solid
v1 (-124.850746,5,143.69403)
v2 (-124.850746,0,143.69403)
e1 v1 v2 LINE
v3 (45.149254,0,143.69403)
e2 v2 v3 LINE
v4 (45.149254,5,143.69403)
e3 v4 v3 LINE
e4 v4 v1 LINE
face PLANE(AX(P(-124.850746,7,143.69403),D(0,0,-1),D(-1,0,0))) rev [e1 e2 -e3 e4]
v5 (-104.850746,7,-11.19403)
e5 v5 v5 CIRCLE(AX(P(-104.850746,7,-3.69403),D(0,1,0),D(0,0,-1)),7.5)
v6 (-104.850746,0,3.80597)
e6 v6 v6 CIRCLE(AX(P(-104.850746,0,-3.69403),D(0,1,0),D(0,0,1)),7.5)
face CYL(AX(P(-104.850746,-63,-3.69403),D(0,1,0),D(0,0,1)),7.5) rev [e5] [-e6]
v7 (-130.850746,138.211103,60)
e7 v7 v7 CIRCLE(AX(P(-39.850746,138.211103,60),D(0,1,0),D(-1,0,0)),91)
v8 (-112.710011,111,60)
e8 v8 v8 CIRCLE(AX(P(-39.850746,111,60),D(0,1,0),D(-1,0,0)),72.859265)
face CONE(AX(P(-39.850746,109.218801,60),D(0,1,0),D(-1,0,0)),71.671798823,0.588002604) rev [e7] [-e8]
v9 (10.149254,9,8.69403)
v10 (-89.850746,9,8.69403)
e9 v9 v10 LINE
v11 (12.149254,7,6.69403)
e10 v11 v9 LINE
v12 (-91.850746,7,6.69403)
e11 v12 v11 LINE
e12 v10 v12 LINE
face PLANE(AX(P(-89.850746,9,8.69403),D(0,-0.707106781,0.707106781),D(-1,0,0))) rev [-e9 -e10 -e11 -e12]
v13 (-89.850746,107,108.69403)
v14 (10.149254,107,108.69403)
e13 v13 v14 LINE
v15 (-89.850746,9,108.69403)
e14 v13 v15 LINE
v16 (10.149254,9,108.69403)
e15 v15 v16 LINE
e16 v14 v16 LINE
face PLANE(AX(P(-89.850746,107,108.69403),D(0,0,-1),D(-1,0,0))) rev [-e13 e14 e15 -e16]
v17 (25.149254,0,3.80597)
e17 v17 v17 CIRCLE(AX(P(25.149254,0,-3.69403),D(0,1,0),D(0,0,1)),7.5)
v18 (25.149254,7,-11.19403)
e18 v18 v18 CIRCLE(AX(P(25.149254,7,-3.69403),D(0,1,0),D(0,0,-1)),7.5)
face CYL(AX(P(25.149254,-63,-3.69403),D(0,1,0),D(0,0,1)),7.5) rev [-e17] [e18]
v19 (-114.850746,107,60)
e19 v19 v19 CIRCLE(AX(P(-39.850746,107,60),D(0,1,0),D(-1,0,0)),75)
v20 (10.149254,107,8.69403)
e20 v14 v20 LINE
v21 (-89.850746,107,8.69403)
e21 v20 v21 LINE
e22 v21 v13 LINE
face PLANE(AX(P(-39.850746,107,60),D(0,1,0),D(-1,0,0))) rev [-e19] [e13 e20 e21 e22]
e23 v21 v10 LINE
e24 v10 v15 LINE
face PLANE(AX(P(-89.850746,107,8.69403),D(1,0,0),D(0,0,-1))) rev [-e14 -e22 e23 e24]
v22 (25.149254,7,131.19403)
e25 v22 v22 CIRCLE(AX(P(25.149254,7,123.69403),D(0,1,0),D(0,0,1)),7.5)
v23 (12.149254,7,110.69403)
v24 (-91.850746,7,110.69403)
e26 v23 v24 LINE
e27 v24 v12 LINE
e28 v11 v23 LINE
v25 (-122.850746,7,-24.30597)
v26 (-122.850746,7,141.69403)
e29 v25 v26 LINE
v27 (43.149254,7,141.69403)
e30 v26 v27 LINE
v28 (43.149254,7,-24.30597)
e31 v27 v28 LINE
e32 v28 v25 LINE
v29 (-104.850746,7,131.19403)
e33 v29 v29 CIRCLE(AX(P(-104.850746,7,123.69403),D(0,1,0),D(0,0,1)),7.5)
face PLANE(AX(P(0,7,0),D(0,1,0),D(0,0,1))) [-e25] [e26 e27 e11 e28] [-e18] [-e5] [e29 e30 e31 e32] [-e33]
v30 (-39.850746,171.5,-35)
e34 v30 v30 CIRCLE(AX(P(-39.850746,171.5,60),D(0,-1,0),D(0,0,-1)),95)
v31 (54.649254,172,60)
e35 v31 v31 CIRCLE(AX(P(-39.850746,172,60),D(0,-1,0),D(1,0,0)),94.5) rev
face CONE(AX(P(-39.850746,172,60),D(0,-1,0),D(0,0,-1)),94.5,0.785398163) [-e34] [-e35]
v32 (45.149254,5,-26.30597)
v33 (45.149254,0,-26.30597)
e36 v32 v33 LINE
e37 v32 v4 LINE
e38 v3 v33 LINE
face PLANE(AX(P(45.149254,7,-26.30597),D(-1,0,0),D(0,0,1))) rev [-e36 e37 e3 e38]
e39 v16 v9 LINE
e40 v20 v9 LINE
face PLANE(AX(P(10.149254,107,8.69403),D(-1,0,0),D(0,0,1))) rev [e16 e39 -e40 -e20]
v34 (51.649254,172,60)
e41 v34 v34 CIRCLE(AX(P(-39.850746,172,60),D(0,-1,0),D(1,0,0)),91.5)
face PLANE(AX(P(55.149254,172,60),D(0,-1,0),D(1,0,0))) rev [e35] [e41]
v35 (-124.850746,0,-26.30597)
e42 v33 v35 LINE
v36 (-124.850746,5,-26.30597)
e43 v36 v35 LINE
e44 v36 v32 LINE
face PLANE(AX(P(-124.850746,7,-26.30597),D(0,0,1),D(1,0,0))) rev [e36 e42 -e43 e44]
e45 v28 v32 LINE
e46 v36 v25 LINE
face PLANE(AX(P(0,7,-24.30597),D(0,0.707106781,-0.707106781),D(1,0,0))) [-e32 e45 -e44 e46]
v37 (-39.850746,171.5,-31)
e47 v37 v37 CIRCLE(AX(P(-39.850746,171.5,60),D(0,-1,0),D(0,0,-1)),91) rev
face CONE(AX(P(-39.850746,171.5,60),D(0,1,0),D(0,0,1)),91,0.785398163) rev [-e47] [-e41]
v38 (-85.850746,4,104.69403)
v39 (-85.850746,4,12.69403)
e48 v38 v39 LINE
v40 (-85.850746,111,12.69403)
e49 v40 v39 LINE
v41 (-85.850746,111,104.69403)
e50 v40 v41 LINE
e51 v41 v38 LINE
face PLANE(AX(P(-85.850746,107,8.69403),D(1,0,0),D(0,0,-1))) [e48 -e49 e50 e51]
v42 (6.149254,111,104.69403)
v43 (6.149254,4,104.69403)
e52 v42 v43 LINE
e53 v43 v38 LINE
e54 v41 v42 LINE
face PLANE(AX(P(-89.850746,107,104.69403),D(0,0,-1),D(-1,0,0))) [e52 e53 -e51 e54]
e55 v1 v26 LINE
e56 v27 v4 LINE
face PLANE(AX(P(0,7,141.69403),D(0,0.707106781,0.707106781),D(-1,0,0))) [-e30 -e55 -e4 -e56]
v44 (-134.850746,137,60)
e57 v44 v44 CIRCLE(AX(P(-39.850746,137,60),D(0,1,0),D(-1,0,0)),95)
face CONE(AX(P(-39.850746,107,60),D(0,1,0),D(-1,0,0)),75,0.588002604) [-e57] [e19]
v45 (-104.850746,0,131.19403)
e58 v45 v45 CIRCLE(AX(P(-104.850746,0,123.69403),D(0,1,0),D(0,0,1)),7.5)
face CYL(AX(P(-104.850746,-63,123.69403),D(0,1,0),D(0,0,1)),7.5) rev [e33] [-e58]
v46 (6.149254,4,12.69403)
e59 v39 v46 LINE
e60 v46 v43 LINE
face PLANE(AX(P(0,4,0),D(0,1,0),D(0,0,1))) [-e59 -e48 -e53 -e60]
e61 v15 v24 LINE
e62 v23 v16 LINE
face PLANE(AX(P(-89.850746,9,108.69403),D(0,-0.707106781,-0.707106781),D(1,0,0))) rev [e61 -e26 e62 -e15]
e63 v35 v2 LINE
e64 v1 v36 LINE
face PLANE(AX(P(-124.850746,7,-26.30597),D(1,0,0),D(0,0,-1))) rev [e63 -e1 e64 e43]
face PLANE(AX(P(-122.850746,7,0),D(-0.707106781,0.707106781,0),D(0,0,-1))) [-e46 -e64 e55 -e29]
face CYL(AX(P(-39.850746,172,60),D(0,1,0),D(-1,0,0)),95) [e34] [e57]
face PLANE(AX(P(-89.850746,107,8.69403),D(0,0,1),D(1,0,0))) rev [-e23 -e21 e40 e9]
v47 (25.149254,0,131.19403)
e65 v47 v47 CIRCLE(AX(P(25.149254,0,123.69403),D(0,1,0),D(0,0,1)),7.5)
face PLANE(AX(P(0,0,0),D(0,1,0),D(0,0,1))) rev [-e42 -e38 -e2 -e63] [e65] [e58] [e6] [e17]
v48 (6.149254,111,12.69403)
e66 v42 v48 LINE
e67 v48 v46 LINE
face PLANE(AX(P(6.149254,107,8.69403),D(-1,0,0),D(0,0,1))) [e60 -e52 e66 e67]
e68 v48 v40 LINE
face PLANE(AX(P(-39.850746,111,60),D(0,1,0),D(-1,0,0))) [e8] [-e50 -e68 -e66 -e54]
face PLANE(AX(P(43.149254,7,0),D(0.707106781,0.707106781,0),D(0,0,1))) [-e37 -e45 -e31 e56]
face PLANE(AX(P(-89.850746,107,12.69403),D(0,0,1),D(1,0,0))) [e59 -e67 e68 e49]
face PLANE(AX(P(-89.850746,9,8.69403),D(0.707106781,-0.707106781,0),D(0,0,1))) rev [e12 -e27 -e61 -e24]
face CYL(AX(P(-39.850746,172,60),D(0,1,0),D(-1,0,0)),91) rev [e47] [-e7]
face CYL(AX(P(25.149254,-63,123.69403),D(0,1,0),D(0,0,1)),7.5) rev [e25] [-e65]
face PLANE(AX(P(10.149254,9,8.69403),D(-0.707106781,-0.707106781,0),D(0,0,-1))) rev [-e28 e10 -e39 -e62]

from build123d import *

# Parameters (mm, degrees)
ESQUISSE1_W             = 170
ESQUISSE1_H             = 170
BOSS_EXTRU_1_DEPTH      = 7
ESQUISSE2_W             = 100
ESQUISSE2_H             = 100
BOSS_EXTRU_2_DEPTH      = 100
COQUE1_START            = 4
COQUE1_OUTLINE_W        = 92
COQUE1_OUTLINE_H        = 92
COQUE1_DEPTH            = 168
COQUE1_START_2          = 138.211102451
COQUE1_2_OUTLINE_R      = 91
COQUE1_2_OUTLINE_W      = 92
COQUE1_2_OUTLINE_H      = 92
COQUE1_2_DEPTH          = 33.788897549
CHANFREIN1_SIZE         = 2
CHANFREIN2_SIZE         = 0.5
ESQUISSE4_R             = 7.5
ENL_V_MAT_EXTRU_1_DEPTH = 70


with BuildPart() as part:
    # Esquisse1 → Boss.-Extru.1 (new body)
    with BuildSketch(Plane(origin=(0, 0, 0), x_dir=(1, 0, 0), z_dir=(0, 1, 0))):
        with Locations((-39.850746269, -58.694029851)):
            Rectangle(ESQUISSE1_W, ESQUISSE1_H)
    extrude(amount=BOSS_EXTRU_1_DEPTH)

    # Esquisse2 → Boss.-Extru.2 (add)
    with BuildSketch(Plane(origin=(0, 7, 0), x_dir=(1, 0, 0), z_dir=(0, 1, 0))):
        with Locations((-39.850746269, -58.694029851)):
            Rectangle(ESQUISSE2_W, ESQUISSE2_H)
    extrude(amount=BOSS_EXTRU_2_DEPTH)

    # Esquisse3 → Révolution1 (revolve)
    with BuildSketch(Plane.XY.offset(60), mode=Mode.PRIVATE) as r_volution1_sk:
        Polygon((55.149253731, 137), (55.149253731, 172), (-39.850746269, 172), (-39.850746269, 107), (35.149253731, 107), align=None)
    revolve(r_volution1_sk.sketch.rotate(Axis((-39.850746269, 172, 60), (0, -1, 0)), 180), axis=Axis((-39.850746269, 172, 60), (0, -1, 0)))

    # Coque1: read off the stored shape, not the designer's step
    # Coque1 outline → Coque1 (cut)
    with BuildSketch(Plane(origin=(0, 0, 0), x_dir=(1, 0, 0), z_dir=(0, 1, 0)).offset(COQUE1_START)):
        with Locations((-39.850746269, -58.694029851)):
            Rectangle(COQUE1_OUTLINE_W, COQUE1_OUTLINE_H)
    extrude(amount=COQUE1_DEPTH, mode=Mode.SUBTRACT)

    # Coque1 2 outline → Coque1 2 (cut)
    with BuildSketch(Plane(origin=(0, 0, 0), x_dir=(1, 0, 0), z_dir=(0, 1, 0)).offset(COQUE1_START_2)):
        with Locations((-39.850746269, -60)):
            Circle(COQUE1_2_OUTLINE_R)
        with Locations((-39.850746269, -58.694029851)):
            Rectangle(COQUE1_2_OUTLINE_W, COQUE1_2_OUTLINE_H, mode=Mode.SUBTRACT)
    extrude(amount=COQUE1_2_DEPTH, mode=Mode.SUBTRACT)

    # Coque1 3 outline → Coque1 3 (revolve, cut)
    with BuildSketch(Plane(origin=(-39.850746269, 0, 60), x_dir=(1, 0, 0), z_dir=(0, 0, 1))):
        Polygon((44.694029851, 138.211102551), (44.694029851, 111), (72.859264966, 111), (91, 138.211102551), align=None)
    revolve(axis=Axis((-39.850746269, 0, 60), (0, 1, 0)), mode=Mode.SUBTRACT)

    # Chanfrein1
    chanfrein1_edges = [part.edges().sort_by_distance(p)[0] for p in [
        (45.149253731, 7, 58.694029851),
        (-89.850746269, 7, 58.694029851),
        (-39.850746269, 7, 108.694029851),
        (10.149253731, 7, 58.694029851),
        (-39.850746269, 7, 8.694029851),
        (-39.850746269, 7, -26.305970149),
        (-124.850746269, 7, 58.694029851),
        (-39.850746269, 7, 143.694029851),
    ]]
    chamfer(chanfrein1_edges, length=CHANFREIN1_SIZE)

    # Chanfrein2
    chanfrein2_edges = [part.edges().sort_by_distance(p)[0] for p in [
        (55.149253731, 172, 60),
        (-130.850746269, 172, 60),
    ]]
    chamfer(chanfrein2_edges, length=CHANFREIN2_SIZE)

    # Esquisse4 → Enlèv. mat.-Extru.1 (cut)
    with BuildSketch(Plane(origin=(0, 7, 0), x_dir=(1, 0, 0), z_dir=(0, 1, 0))):
        with Locations(Location((25.149253731, -123.694029851, 0), (0, 0, 270))):
            Circle(ESQUISSE4_R)
        with Locations(Location((25.149253731, 3.694029851, 0), (0, 0, 270))):
            Circle(ESQUISSE4_R)
        with Locations(Location((-104.850746269, -123.694029851, 0), (0, 0, 270))):
            Circle(ESQUISSE4_R)
        with Locations(Location((-104.850746269, 3.694029851, 0), (0, 0, 270))):
            Circle(ESQUISSE4_R)
    extrude(amount=-ENL_V_MAT_EXTRU_1_DEPTH, mode=Mode.SUBTRACT)


solid = part.part
